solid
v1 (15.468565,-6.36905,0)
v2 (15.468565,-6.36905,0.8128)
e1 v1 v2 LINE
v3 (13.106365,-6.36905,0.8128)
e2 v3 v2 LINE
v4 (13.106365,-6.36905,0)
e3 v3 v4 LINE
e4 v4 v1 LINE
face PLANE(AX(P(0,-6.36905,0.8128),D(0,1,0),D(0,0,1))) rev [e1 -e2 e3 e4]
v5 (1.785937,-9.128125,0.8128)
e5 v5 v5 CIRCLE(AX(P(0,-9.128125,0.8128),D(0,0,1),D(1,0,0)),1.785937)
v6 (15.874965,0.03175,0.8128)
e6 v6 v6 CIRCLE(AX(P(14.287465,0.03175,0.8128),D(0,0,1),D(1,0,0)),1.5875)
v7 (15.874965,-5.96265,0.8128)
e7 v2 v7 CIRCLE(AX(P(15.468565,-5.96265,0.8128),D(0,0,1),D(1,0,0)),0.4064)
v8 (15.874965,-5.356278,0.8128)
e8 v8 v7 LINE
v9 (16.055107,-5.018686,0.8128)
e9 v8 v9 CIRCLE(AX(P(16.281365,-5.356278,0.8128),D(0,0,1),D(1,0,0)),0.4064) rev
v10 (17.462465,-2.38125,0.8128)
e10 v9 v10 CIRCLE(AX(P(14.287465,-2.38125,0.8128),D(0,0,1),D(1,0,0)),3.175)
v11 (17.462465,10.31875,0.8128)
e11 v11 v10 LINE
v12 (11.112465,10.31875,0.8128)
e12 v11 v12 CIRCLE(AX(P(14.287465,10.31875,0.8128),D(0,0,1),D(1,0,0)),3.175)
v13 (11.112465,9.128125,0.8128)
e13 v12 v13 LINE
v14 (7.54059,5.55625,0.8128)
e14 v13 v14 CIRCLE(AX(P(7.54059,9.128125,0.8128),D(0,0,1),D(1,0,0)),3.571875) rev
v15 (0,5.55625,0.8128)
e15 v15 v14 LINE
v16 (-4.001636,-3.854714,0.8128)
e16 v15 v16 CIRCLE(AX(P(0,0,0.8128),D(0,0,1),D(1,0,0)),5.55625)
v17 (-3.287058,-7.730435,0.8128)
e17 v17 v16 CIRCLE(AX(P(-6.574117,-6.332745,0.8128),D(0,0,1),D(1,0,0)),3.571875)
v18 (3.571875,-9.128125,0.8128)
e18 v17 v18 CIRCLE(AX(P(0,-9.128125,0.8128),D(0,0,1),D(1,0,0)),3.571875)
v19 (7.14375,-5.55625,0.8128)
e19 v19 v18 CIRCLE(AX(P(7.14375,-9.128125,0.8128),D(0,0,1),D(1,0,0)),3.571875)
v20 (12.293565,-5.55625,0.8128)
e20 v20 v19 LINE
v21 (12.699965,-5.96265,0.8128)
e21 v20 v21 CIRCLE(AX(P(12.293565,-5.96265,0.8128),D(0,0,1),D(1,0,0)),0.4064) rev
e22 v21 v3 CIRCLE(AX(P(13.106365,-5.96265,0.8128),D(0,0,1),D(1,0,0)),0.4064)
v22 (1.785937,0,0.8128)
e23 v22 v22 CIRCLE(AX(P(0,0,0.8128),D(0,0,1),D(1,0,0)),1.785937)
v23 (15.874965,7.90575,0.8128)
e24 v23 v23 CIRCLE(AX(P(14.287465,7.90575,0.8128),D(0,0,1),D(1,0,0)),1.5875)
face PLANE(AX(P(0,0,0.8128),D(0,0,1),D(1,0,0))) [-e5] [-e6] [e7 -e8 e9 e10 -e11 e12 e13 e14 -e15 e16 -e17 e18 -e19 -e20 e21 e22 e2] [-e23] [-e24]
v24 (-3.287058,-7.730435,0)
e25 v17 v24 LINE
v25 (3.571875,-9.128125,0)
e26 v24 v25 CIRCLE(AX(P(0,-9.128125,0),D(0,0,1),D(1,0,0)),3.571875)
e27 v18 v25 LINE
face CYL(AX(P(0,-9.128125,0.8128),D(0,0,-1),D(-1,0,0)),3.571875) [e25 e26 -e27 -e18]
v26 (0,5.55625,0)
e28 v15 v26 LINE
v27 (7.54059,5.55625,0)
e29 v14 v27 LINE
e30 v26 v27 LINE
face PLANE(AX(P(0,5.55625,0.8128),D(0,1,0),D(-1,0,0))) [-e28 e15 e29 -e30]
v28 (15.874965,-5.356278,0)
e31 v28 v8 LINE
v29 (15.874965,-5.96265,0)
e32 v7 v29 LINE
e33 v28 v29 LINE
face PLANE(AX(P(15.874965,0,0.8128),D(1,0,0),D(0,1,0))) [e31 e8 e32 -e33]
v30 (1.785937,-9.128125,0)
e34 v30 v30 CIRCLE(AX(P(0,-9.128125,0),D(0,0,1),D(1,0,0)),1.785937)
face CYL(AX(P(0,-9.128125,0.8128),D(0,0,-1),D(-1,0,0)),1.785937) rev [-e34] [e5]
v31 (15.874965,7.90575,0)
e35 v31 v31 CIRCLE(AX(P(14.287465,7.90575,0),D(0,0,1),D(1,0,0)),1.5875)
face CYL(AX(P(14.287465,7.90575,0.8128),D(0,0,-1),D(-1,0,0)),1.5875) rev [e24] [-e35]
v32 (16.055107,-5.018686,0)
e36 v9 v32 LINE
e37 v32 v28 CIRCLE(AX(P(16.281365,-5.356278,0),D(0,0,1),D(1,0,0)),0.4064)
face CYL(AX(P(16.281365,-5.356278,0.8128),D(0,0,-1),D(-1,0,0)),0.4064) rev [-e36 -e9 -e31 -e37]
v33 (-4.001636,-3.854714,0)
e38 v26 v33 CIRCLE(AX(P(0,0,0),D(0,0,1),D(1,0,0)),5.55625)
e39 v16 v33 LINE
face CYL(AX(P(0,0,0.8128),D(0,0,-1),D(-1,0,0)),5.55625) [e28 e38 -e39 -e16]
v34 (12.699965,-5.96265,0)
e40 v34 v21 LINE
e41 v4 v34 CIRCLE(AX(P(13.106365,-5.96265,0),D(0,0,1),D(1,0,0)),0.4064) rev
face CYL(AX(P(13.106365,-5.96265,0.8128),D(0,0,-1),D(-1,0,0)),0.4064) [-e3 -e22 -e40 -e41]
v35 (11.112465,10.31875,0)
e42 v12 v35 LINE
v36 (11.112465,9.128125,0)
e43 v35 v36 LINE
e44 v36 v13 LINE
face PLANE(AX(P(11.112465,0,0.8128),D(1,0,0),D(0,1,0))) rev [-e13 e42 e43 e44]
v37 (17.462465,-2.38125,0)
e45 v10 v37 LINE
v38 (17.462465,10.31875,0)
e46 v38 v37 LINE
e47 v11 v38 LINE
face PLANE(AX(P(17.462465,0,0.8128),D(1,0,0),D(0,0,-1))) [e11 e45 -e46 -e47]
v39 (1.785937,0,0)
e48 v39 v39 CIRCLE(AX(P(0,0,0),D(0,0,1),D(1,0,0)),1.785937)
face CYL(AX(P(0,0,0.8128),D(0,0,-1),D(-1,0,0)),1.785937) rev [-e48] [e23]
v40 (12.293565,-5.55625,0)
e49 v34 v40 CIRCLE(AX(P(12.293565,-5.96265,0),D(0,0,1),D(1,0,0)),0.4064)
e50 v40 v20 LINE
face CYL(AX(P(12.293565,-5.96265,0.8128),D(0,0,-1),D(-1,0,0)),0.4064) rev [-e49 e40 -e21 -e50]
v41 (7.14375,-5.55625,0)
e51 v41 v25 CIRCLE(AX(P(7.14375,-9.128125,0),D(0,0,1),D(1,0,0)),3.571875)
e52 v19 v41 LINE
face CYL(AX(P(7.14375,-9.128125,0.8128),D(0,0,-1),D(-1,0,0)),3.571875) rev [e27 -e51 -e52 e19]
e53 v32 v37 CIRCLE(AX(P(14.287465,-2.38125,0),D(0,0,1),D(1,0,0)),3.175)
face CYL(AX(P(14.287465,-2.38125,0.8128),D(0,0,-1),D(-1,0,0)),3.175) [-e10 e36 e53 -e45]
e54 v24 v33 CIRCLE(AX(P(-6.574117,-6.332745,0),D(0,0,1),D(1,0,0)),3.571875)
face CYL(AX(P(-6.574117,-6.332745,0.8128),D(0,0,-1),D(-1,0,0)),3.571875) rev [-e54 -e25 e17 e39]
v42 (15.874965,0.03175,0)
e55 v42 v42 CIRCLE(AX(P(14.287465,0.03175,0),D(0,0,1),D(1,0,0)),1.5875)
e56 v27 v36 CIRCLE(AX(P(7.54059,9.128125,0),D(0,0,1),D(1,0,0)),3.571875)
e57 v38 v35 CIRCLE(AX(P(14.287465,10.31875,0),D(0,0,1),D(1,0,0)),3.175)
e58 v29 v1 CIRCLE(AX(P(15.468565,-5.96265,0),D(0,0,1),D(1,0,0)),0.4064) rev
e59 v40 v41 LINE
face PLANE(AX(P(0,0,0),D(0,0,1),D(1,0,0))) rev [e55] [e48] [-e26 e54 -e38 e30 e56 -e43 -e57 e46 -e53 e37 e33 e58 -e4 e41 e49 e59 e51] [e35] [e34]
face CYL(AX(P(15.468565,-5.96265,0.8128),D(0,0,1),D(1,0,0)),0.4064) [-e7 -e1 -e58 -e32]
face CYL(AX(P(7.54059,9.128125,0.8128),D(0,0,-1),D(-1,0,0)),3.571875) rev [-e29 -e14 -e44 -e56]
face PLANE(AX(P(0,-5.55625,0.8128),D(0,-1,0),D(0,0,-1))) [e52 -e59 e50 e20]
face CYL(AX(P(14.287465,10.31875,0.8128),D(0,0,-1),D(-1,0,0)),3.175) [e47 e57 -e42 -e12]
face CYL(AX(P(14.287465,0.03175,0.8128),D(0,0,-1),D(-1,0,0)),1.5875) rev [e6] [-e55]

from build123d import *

# Parameters (mm, degrees)
SKETCH1_R           = 1.5875
SKETCH1_R_2         = 1.7859375
BOSS_EXTRUDE1_DEPTH = 0.8128
FILLET1_R           = 0.4064
FILLET2_R           = 3.571875


with BuildPart() as part:
    # Sketch1 → Boss-Extrude1 (new body)
    with BuildSketch(Plane.XY):
        with BuildLine():
            ThreePointArc((17.462464722, 10.31875), (14.287464722, 13.49375), (11.112464722, 10.31875))
            Line((11.112464722, 10.31875), (11.112464722, 5.55625))
            Line((11.112464722, 5.55625), (0, 5.55625))
            ThreePointArc((0, 5.55625), (-5.113201992, 2.17418478), (-4.001636336, -3.854714088))
            ThreePointArc((-4.001636336, -3.854714088), (-3.061446663, -5.6851033), (-3.287058398, -7.730434724))
            ThreePointArc((-3.287058398, -7.730434724), (-0.713207299, -12.628071623), (3.571875, -9.128125))
            ThreePointArc((3.571875, -9.128125), (4.61805296, -6.602427972), (7.143749984, -5.55625))
            Line((7.143749984, -5.55625), (12.699964722, -5.55625))
            Line((12.699964722, -5.55625), (12.699964722, -6.36905))
            Line((12.699964722, -6.36905), (15.874964722, -6.36905))
            Line((15.874964722, -6.36905), (15.874964722, -5.130880657))
            ThreePointArc((15.874964722, -5.130880657), (17.037095379, -3.96875), (17.462464722, -2.38125))
            Line((17.462464722, -2.38125), (17.462464722, 10.31875))
        make_face()
        with Locations((14.287464722, 0.03175)):
            Circle(SKETCH1_R, mode=Mode.SUBTRACT)
        with Locations((14.287464722, 7.90575)):
            Circle(SKETCH1_R, mode=Mode.SUBTRACT)
        Circle(SKETCH1_R_2, mode=Mode.SUBTRACT)
        with Locations((0, -9.128125)):
            Circle(SKETCH1_R_2, mode=Mode.SUBTRACT)
    extrude(amount=BOSS_EXTRUDE1_DEPTH)

    # Fillet1
    fillet1_edges = [part.edges().sort_by_distance(p)[0] for p in [
        (15.874964722, -5.130880657, 0.4064),
        (15.874964722, -6.36905, 0.4064),
        (12.699964722, -5.55625, 0.4064),
        (12.699964722, -6.36905, 0.4064),
    ]]
    fillet(fillet1_edges, radius=FILLET1_R - 0.0001)  # a hair under: the kernel refuses the full size

    # Fillet2
    fillet2_edges = [part.edges().sort_by_distance(p)[0] for p in [
        (11.112464722, 5.55625, 0.4064),
    ]]
    fillet(fillet2_edges, radius=FILLET2_R)


solid = part.part
